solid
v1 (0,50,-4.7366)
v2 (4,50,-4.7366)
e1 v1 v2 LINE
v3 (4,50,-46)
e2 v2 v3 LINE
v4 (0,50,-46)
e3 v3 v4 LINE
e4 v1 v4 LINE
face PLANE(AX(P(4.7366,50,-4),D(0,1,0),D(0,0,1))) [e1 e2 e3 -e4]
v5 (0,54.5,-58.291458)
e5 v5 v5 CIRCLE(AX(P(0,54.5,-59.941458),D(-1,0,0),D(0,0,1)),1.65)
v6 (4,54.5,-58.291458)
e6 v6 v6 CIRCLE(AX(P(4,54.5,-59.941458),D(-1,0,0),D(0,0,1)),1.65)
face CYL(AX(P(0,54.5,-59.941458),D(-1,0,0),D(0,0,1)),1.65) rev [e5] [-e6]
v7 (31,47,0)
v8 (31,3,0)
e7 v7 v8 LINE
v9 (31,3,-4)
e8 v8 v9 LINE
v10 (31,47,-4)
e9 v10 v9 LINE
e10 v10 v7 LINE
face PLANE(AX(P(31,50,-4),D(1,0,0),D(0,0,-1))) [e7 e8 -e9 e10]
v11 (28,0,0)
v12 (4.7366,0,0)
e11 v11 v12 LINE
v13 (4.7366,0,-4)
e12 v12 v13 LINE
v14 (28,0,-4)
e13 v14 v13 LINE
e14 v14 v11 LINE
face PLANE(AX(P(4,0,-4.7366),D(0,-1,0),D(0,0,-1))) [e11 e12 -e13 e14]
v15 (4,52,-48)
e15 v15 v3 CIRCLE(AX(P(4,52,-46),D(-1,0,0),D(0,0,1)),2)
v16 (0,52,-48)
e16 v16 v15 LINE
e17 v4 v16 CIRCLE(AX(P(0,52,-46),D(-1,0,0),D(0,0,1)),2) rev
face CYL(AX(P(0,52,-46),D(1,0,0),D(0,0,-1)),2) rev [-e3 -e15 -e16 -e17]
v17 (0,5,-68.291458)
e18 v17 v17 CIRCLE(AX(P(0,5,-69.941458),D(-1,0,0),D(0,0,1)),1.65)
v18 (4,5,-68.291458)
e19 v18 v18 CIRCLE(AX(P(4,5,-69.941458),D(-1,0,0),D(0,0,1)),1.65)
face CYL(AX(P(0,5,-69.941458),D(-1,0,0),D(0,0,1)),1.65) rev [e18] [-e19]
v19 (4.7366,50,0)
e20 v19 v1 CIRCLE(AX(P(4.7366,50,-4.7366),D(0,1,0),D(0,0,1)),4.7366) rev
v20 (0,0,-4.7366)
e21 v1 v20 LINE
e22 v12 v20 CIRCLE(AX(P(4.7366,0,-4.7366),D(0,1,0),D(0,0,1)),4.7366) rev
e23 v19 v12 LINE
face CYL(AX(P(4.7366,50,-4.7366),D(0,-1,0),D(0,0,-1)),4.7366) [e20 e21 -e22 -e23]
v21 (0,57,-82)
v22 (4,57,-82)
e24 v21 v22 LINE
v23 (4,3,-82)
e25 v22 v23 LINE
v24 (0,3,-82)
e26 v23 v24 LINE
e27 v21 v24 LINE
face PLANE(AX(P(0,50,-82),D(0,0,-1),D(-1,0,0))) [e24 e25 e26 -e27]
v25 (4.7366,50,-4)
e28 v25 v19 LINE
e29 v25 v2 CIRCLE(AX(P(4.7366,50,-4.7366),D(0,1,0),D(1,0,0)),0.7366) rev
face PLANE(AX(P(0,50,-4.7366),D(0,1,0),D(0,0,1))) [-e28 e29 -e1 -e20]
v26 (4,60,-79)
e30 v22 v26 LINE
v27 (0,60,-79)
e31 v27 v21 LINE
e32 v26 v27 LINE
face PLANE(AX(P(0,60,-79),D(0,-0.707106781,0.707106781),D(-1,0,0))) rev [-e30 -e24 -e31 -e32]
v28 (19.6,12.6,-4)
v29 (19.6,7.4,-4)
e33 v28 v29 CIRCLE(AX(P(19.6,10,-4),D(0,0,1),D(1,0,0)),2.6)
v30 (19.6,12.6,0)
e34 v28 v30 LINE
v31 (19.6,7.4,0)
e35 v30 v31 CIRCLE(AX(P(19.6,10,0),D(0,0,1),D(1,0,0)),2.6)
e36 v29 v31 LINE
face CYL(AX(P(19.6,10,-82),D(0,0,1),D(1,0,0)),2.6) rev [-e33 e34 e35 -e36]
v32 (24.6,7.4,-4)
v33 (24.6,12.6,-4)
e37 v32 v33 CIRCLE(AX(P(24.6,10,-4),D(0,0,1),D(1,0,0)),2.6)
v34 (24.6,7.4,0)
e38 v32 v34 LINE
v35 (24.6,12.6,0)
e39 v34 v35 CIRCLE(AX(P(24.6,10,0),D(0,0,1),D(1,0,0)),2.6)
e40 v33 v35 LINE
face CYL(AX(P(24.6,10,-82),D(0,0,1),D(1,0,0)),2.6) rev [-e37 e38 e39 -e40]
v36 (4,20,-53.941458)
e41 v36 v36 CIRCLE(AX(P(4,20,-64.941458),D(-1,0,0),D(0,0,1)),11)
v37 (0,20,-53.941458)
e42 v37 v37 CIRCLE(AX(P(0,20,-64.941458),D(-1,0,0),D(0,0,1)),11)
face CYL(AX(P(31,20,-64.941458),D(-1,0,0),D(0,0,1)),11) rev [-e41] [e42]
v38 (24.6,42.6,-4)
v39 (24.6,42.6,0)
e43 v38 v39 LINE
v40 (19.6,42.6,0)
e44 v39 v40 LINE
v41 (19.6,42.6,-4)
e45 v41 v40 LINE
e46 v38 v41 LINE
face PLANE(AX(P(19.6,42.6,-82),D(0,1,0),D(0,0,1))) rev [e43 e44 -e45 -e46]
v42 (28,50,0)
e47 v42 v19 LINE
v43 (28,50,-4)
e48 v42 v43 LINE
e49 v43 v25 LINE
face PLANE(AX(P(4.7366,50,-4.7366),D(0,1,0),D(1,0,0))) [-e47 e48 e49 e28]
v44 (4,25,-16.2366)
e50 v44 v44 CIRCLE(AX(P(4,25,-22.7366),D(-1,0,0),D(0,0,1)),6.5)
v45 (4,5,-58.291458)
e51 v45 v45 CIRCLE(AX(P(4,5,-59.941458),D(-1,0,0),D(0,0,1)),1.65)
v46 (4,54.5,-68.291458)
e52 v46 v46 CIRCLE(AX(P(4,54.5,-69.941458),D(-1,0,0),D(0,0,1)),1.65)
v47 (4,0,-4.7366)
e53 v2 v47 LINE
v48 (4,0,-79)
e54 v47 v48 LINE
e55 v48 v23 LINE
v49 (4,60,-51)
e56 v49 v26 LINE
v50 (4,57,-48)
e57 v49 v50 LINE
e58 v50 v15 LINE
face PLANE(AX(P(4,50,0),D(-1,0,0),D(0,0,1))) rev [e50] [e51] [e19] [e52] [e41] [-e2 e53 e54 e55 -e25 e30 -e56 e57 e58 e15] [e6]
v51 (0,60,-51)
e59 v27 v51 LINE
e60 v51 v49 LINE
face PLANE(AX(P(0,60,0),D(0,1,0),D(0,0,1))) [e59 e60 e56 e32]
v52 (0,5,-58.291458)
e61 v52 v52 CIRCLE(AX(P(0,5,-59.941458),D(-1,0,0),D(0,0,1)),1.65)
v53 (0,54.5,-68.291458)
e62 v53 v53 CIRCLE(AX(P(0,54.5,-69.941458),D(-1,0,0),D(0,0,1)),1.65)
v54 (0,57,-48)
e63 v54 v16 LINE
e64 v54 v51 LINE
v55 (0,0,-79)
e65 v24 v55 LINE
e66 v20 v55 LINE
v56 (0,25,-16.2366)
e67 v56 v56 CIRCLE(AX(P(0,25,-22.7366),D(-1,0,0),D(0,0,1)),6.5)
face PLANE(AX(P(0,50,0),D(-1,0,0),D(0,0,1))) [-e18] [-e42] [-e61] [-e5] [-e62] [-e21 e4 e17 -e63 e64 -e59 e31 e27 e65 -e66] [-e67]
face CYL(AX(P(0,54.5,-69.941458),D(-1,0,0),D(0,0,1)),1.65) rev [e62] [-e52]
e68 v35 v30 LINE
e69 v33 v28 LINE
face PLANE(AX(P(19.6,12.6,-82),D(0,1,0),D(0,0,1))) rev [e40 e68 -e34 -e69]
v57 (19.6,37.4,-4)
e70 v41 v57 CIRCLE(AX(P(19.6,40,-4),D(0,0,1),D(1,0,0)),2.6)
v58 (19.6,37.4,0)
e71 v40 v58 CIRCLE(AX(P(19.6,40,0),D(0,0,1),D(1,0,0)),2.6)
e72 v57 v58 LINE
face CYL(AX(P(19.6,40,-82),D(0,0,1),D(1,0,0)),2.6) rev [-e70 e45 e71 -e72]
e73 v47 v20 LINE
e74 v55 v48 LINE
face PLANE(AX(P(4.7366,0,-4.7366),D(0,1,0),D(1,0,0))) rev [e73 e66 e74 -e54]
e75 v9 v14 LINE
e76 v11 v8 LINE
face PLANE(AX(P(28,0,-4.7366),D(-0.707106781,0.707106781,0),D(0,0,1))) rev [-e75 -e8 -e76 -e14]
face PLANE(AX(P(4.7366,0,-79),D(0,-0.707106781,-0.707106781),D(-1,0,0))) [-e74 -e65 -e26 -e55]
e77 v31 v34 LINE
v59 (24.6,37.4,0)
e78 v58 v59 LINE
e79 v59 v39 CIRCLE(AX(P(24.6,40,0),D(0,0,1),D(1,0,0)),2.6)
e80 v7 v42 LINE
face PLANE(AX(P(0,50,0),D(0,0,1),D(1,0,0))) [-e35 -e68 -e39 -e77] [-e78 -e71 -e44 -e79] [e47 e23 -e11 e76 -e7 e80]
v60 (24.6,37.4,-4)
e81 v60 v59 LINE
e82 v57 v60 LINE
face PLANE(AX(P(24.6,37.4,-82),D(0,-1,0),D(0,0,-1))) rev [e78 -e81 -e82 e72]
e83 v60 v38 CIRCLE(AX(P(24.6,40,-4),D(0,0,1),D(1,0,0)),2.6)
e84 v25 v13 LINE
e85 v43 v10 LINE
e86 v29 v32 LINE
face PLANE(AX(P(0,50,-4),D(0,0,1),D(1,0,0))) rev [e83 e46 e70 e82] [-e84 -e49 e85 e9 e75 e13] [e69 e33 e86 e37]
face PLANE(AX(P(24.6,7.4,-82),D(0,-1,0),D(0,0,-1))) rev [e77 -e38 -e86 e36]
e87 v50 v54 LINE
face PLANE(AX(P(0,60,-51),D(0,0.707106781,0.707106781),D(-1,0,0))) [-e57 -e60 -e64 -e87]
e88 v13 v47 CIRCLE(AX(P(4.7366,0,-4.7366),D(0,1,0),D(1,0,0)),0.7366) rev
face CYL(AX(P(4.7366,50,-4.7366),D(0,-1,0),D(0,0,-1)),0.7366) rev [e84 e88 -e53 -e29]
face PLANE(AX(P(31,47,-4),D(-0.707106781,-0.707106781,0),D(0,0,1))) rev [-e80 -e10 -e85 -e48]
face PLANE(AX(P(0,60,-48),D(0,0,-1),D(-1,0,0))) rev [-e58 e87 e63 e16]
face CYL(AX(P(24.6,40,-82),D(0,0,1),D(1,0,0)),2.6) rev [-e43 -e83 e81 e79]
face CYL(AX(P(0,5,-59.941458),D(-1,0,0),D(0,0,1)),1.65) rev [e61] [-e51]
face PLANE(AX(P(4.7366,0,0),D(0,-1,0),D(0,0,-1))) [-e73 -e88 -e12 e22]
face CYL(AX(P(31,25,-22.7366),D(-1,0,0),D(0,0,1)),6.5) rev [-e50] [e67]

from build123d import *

# Parameters (mm, degrees)
SM_BASE_FLANGE_1_DEPTH = 50
SKETCH_3_R             = 6.5
CUT_EXTRUDE_2_DEPTH    = 101.920760996
SKETCH_5_R             = 11
CUT_EXTRUDE_5_DEPTH    = 101.920760996
SKETCH_6_W             = 4
SKETCH_6_H             = 34
EXTRUDE_2_DEPTH        = 10
CHAMFER_1_SIZE         = 3
CUT_EXTRUDE_6_DEPTH    = 107.230880633
PATTERN_LINEAR_3_COUNT = 2
PATTERN_LINEAR_3_PITCH = 30
FILLET_1_R             = 2
M4X0_7_1_D             = 3.3


# Sheet-metal steps are written as plain solids
with BuildPart() as part:
    # Sketch 1 → 基材-凸緣1 (new body)
    with BuildSketch(Plane(origin=(0, 0, 0), x_dir=(1, 0, 0), z_dir=(0, 1, 0))):
        with BuildLine():
            Line((31, 0), (4.7366, 0))
            ThreePointArc((4.7366, 0), (1.38731802, 1.38731802), (0, 4.7366))
            Line((0, 4.7366), (0, 82))
            Line((0, 82), (4, 82))
            Line((4, 82), (4, 4.7366))
            ThreePointArc((4, 4.7366), (4.215745145, 4.215745145), (4.7366, 4))
            Line((4.7366, 4), (31, 4))
            Line((31, 4), (31, 0))
        make_face()
    extrude(amount=SM_BASE_FLANGE_1_DEPTH)

    # 草圖3 → 除料-伸長2 (cut, through all)
    with BuildSketch(Plane.ZY):
        with Locations((-22.7366, 25)):
            Circle(SKETCH_3_R)
    extrude(amount=-CUT_EXTRUDE_2_DEPTH, mode=Mode.SUBTRACT)

    # 草圖5 → 除料-伸長5 (cut, through all)
    with BuildSketch(Plane.ZY):
        with Locations((-64.94145754, 20)):
            Circle(SKETCH_5_R)
    extrude(amount=-CUT_EXTRUDE_5_DEPTH, mode=Mode.SUBTRACT)

    # 草圖6 → 填料-伸長2 (add)
    with BuildSketch(Plane(origin=(0, 50, 0), x_dir=(1, 0, 0), z_dir=(0, 1, 0))):
        with Locations((2, 65)):
            Rectangle(SKETCH_6_W, SKETCH_6_H)
    extrude(amount=EXTRUDE_2_DEPTH)

    # 導角1
    chamfer_1_edges = [part.edges().sort_by_distance(p)[0] for p in [
        (31, 50, -2),
        (2, 60, -48),
        (2, 60, -82),
        (31, 0, -2),
        (2, 0, -82),
    ]]
    chamfer(chamfer_1_edges, length=CHAMFER_1_SIZE)

    # 草圖8 → 除料-伸長6 (cut, through all)
    with BuildSketch(Plane.XY):
        with BuildLine():
            Line((19.6, 42.6), (24.6, 42.6))
            ThreePointArc((24.6, 42.6), (27.2, 40), (24.6, 37.4))
            Line((24.6, 37.4), (19.6, 37.4))
            ThreePointArc((19.6, 37.4), (17, 40), (19.6, 42.6))
        make_face()
    cut_extrude_6 = extrude(amount=-CUT_EXTRUDE_6_DEPTH, mode=Mode.SUBTRACT)

    # 直線複製排列3: 除料-伸長6 ×2
    with Locations(*[(0, -i * PATTERN_LINEAR_3_PITCH, 0) for i in range(1, PATTERN_LINEAR_3_COUNT)]):
        add(cut_extrude_6, mode=Mode.SUBTRACT)

    # 圓角1
    fillet_1_edges = [part.edges().sort_by_distance(p)[0] for p in [
        (2, 50, -48),
    ]]
    fillet(fillet_1_edges, radius=FILLET_1_R)

    # M4x0.7 螺紋孔1 (through all)
    with Locations(Plane.ZY):
        with Locations((-59.94145754, 5), (-69.94145754, 5), (-69.94145754, 54.5), (-59.94145754, 54.5)):
            Hole(M4X0_7_1_D / 2)


solid = part.part
